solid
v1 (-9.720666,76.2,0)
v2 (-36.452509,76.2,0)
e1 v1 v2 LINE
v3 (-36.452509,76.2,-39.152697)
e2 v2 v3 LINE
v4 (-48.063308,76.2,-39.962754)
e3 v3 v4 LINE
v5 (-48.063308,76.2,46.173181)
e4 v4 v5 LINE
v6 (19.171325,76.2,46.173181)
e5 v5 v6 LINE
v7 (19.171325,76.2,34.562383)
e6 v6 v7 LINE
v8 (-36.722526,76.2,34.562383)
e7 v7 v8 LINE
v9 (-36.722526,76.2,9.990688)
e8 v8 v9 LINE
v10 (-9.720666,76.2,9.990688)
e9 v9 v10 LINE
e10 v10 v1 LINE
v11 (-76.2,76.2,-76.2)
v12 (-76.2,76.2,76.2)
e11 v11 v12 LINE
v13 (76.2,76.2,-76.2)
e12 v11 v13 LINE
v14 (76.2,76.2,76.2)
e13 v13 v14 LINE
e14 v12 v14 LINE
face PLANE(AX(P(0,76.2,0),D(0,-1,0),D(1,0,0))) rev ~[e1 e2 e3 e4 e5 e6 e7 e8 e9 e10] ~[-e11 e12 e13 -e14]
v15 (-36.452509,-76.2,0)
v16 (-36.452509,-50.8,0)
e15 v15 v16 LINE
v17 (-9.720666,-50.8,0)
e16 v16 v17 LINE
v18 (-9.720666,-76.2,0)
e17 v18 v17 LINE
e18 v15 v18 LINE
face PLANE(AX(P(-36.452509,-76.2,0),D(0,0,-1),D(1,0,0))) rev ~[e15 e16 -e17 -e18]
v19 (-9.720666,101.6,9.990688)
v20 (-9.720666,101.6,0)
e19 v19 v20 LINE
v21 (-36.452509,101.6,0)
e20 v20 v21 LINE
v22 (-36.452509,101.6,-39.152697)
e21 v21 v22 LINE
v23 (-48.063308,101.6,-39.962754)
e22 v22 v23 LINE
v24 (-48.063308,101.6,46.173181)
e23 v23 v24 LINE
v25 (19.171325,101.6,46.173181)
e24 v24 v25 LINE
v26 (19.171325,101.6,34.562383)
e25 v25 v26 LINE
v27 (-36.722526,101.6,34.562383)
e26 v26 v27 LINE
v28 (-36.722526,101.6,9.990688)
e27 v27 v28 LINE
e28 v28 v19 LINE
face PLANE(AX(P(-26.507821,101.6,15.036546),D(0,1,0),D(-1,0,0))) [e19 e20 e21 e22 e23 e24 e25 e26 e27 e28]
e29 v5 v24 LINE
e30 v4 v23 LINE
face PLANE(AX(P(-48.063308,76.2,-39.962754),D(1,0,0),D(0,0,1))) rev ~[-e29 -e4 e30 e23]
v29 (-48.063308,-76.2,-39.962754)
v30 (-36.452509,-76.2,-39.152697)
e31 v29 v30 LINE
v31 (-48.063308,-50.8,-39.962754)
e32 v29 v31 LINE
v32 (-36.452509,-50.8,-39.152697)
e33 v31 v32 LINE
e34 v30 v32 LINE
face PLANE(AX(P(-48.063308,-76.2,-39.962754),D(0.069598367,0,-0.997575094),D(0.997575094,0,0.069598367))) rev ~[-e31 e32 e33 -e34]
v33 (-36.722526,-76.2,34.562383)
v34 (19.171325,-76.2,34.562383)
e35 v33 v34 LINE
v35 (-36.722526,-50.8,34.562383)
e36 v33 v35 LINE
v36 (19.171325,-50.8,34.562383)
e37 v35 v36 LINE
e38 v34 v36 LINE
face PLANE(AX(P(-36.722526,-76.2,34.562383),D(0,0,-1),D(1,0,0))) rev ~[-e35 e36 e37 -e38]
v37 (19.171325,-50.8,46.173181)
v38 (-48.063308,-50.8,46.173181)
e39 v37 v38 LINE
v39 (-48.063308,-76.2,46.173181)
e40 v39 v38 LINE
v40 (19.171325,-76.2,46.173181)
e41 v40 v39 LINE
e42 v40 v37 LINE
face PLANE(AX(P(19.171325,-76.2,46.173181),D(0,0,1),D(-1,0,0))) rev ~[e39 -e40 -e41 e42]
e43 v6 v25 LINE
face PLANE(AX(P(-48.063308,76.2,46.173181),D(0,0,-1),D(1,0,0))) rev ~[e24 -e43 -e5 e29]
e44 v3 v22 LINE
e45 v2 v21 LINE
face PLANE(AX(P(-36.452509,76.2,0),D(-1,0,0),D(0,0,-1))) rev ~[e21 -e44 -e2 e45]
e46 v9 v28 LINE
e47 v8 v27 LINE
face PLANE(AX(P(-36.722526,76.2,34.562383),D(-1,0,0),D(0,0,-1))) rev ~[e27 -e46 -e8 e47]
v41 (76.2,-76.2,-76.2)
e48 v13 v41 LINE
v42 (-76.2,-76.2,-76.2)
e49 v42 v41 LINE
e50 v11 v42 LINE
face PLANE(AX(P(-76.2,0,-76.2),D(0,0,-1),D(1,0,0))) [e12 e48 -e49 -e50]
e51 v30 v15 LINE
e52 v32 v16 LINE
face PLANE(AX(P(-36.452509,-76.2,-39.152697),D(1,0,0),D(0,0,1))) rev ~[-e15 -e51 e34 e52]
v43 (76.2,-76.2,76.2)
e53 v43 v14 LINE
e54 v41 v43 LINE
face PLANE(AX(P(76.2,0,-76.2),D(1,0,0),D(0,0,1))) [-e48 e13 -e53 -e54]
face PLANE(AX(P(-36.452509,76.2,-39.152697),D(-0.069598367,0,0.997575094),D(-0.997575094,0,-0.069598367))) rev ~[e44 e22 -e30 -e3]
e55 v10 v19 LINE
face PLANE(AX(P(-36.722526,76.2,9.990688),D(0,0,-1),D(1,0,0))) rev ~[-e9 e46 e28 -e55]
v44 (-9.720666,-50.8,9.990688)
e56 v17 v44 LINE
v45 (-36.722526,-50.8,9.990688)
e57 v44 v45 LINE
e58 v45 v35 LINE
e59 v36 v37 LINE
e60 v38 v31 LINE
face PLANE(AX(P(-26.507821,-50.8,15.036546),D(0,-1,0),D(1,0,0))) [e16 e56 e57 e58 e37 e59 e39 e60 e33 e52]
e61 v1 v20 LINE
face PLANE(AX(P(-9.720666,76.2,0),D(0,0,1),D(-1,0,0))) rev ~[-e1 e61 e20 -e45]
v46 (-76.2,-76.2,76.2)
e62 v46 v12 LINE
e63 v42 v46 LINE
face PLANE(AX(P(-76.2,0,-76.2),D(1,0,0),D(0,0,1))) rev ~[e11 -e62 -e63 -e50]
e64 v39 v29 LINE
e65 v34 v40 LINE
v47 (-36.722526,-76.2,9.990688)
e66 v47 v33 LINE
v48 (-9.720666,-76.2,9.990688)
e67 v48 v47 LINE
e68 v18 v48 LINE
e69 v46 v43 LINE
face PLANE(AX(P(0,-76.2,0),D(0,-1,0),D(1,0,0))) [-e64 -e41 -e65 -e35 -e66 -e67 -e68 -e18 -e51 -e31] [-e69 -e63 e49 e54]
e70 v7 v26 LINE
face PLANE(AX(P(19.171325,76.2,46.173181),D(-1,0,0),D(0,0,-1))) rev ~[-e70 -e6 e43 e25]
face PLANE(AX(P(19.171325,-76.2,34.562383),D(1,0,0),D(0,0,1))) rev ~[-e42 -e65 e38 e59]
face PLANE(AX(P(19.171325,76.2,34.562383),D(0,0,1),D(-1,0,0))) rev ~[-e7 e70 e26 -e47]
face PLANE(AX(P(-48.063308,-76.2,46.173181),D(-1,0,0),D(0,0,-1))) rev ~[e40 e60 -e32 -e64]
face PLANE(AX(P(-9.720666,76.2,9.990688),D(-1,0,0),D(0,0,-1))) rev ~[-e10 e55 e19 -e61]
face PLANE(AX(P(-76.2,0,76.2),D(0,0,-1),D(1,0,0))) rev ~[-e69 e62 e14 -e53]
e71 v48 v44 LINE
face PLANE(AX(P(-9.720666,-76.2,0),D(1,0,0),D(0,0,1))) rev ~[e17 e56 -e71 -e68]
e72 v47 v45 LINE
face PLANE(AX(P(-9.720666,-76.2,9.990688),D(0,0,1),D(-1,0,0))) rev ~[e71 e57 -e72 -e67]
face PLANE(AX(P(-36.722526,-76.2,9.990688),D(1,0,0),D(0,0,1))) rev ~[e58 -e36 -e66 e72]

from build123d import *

# Parameters (mm, degrees)
F1_W     = 152.4
F1_H     = 152.4
F2_DEPTH = 76.2
F4_DEPTH = 25.4
F6_DEPTH = 25.4


# Not quite as in the source:
# - a variable given as a bare number and used for a length is read in inches; the dataset says mm whatever the document's units were


with BuildPart() as f2:
    # F1 (on Front) → F2 (new body, symmetric)
    with BuildSketch(Plane.XZ):
        Rectangle(F1_W, F1_H)
    extrude(amount=F2_DEPTH, both=True)

    # F3 (on face) → F4 (cut)
    with BuildSketch(Plane.XZ.offset(76.2)):
        Polygon((19.1713254899, 46.1731813848), (-48.0633080006, 46.1731813848), (-48.0633080006, -39.9627536535), (-36.4525094628, -39.1526967287), (-36.4525094628, 0), (-9.720666334, 0), (-9.720666334, 9.9906884134), (-36.7225259542, 9.9906884134), (-36.7225259542, 34.5623828471), (19.1713254899, 34.5623828471), align=None)
    extrude(amount=-F4_DEPTH, mode=Mode.SUBTRACT)

    # F5 (on face) → F6 (join)
    with BuildSketch(Plane(origin=(0, 76.2, 0), x_dir=(-1, 0, 0), z_dir=(0, 1, 0))):
        Polygon((48.0633080006, -39.9627536535), (48.0633080006, 46.1731813848), (-19.1713254899, 46.1731813848), (-19.1713254899, 34.5623828471), (36.7225259542, 34.5623828471), (36.7225259542, 9.9906884134), (9.720666334, 9.9906884134), (9.720666334, 0), (36.4525094628, 0), (36.4525094628, -39.1526967287), align=None)
    extrude(amount=F6_DEPTH)


solid = f2.part
